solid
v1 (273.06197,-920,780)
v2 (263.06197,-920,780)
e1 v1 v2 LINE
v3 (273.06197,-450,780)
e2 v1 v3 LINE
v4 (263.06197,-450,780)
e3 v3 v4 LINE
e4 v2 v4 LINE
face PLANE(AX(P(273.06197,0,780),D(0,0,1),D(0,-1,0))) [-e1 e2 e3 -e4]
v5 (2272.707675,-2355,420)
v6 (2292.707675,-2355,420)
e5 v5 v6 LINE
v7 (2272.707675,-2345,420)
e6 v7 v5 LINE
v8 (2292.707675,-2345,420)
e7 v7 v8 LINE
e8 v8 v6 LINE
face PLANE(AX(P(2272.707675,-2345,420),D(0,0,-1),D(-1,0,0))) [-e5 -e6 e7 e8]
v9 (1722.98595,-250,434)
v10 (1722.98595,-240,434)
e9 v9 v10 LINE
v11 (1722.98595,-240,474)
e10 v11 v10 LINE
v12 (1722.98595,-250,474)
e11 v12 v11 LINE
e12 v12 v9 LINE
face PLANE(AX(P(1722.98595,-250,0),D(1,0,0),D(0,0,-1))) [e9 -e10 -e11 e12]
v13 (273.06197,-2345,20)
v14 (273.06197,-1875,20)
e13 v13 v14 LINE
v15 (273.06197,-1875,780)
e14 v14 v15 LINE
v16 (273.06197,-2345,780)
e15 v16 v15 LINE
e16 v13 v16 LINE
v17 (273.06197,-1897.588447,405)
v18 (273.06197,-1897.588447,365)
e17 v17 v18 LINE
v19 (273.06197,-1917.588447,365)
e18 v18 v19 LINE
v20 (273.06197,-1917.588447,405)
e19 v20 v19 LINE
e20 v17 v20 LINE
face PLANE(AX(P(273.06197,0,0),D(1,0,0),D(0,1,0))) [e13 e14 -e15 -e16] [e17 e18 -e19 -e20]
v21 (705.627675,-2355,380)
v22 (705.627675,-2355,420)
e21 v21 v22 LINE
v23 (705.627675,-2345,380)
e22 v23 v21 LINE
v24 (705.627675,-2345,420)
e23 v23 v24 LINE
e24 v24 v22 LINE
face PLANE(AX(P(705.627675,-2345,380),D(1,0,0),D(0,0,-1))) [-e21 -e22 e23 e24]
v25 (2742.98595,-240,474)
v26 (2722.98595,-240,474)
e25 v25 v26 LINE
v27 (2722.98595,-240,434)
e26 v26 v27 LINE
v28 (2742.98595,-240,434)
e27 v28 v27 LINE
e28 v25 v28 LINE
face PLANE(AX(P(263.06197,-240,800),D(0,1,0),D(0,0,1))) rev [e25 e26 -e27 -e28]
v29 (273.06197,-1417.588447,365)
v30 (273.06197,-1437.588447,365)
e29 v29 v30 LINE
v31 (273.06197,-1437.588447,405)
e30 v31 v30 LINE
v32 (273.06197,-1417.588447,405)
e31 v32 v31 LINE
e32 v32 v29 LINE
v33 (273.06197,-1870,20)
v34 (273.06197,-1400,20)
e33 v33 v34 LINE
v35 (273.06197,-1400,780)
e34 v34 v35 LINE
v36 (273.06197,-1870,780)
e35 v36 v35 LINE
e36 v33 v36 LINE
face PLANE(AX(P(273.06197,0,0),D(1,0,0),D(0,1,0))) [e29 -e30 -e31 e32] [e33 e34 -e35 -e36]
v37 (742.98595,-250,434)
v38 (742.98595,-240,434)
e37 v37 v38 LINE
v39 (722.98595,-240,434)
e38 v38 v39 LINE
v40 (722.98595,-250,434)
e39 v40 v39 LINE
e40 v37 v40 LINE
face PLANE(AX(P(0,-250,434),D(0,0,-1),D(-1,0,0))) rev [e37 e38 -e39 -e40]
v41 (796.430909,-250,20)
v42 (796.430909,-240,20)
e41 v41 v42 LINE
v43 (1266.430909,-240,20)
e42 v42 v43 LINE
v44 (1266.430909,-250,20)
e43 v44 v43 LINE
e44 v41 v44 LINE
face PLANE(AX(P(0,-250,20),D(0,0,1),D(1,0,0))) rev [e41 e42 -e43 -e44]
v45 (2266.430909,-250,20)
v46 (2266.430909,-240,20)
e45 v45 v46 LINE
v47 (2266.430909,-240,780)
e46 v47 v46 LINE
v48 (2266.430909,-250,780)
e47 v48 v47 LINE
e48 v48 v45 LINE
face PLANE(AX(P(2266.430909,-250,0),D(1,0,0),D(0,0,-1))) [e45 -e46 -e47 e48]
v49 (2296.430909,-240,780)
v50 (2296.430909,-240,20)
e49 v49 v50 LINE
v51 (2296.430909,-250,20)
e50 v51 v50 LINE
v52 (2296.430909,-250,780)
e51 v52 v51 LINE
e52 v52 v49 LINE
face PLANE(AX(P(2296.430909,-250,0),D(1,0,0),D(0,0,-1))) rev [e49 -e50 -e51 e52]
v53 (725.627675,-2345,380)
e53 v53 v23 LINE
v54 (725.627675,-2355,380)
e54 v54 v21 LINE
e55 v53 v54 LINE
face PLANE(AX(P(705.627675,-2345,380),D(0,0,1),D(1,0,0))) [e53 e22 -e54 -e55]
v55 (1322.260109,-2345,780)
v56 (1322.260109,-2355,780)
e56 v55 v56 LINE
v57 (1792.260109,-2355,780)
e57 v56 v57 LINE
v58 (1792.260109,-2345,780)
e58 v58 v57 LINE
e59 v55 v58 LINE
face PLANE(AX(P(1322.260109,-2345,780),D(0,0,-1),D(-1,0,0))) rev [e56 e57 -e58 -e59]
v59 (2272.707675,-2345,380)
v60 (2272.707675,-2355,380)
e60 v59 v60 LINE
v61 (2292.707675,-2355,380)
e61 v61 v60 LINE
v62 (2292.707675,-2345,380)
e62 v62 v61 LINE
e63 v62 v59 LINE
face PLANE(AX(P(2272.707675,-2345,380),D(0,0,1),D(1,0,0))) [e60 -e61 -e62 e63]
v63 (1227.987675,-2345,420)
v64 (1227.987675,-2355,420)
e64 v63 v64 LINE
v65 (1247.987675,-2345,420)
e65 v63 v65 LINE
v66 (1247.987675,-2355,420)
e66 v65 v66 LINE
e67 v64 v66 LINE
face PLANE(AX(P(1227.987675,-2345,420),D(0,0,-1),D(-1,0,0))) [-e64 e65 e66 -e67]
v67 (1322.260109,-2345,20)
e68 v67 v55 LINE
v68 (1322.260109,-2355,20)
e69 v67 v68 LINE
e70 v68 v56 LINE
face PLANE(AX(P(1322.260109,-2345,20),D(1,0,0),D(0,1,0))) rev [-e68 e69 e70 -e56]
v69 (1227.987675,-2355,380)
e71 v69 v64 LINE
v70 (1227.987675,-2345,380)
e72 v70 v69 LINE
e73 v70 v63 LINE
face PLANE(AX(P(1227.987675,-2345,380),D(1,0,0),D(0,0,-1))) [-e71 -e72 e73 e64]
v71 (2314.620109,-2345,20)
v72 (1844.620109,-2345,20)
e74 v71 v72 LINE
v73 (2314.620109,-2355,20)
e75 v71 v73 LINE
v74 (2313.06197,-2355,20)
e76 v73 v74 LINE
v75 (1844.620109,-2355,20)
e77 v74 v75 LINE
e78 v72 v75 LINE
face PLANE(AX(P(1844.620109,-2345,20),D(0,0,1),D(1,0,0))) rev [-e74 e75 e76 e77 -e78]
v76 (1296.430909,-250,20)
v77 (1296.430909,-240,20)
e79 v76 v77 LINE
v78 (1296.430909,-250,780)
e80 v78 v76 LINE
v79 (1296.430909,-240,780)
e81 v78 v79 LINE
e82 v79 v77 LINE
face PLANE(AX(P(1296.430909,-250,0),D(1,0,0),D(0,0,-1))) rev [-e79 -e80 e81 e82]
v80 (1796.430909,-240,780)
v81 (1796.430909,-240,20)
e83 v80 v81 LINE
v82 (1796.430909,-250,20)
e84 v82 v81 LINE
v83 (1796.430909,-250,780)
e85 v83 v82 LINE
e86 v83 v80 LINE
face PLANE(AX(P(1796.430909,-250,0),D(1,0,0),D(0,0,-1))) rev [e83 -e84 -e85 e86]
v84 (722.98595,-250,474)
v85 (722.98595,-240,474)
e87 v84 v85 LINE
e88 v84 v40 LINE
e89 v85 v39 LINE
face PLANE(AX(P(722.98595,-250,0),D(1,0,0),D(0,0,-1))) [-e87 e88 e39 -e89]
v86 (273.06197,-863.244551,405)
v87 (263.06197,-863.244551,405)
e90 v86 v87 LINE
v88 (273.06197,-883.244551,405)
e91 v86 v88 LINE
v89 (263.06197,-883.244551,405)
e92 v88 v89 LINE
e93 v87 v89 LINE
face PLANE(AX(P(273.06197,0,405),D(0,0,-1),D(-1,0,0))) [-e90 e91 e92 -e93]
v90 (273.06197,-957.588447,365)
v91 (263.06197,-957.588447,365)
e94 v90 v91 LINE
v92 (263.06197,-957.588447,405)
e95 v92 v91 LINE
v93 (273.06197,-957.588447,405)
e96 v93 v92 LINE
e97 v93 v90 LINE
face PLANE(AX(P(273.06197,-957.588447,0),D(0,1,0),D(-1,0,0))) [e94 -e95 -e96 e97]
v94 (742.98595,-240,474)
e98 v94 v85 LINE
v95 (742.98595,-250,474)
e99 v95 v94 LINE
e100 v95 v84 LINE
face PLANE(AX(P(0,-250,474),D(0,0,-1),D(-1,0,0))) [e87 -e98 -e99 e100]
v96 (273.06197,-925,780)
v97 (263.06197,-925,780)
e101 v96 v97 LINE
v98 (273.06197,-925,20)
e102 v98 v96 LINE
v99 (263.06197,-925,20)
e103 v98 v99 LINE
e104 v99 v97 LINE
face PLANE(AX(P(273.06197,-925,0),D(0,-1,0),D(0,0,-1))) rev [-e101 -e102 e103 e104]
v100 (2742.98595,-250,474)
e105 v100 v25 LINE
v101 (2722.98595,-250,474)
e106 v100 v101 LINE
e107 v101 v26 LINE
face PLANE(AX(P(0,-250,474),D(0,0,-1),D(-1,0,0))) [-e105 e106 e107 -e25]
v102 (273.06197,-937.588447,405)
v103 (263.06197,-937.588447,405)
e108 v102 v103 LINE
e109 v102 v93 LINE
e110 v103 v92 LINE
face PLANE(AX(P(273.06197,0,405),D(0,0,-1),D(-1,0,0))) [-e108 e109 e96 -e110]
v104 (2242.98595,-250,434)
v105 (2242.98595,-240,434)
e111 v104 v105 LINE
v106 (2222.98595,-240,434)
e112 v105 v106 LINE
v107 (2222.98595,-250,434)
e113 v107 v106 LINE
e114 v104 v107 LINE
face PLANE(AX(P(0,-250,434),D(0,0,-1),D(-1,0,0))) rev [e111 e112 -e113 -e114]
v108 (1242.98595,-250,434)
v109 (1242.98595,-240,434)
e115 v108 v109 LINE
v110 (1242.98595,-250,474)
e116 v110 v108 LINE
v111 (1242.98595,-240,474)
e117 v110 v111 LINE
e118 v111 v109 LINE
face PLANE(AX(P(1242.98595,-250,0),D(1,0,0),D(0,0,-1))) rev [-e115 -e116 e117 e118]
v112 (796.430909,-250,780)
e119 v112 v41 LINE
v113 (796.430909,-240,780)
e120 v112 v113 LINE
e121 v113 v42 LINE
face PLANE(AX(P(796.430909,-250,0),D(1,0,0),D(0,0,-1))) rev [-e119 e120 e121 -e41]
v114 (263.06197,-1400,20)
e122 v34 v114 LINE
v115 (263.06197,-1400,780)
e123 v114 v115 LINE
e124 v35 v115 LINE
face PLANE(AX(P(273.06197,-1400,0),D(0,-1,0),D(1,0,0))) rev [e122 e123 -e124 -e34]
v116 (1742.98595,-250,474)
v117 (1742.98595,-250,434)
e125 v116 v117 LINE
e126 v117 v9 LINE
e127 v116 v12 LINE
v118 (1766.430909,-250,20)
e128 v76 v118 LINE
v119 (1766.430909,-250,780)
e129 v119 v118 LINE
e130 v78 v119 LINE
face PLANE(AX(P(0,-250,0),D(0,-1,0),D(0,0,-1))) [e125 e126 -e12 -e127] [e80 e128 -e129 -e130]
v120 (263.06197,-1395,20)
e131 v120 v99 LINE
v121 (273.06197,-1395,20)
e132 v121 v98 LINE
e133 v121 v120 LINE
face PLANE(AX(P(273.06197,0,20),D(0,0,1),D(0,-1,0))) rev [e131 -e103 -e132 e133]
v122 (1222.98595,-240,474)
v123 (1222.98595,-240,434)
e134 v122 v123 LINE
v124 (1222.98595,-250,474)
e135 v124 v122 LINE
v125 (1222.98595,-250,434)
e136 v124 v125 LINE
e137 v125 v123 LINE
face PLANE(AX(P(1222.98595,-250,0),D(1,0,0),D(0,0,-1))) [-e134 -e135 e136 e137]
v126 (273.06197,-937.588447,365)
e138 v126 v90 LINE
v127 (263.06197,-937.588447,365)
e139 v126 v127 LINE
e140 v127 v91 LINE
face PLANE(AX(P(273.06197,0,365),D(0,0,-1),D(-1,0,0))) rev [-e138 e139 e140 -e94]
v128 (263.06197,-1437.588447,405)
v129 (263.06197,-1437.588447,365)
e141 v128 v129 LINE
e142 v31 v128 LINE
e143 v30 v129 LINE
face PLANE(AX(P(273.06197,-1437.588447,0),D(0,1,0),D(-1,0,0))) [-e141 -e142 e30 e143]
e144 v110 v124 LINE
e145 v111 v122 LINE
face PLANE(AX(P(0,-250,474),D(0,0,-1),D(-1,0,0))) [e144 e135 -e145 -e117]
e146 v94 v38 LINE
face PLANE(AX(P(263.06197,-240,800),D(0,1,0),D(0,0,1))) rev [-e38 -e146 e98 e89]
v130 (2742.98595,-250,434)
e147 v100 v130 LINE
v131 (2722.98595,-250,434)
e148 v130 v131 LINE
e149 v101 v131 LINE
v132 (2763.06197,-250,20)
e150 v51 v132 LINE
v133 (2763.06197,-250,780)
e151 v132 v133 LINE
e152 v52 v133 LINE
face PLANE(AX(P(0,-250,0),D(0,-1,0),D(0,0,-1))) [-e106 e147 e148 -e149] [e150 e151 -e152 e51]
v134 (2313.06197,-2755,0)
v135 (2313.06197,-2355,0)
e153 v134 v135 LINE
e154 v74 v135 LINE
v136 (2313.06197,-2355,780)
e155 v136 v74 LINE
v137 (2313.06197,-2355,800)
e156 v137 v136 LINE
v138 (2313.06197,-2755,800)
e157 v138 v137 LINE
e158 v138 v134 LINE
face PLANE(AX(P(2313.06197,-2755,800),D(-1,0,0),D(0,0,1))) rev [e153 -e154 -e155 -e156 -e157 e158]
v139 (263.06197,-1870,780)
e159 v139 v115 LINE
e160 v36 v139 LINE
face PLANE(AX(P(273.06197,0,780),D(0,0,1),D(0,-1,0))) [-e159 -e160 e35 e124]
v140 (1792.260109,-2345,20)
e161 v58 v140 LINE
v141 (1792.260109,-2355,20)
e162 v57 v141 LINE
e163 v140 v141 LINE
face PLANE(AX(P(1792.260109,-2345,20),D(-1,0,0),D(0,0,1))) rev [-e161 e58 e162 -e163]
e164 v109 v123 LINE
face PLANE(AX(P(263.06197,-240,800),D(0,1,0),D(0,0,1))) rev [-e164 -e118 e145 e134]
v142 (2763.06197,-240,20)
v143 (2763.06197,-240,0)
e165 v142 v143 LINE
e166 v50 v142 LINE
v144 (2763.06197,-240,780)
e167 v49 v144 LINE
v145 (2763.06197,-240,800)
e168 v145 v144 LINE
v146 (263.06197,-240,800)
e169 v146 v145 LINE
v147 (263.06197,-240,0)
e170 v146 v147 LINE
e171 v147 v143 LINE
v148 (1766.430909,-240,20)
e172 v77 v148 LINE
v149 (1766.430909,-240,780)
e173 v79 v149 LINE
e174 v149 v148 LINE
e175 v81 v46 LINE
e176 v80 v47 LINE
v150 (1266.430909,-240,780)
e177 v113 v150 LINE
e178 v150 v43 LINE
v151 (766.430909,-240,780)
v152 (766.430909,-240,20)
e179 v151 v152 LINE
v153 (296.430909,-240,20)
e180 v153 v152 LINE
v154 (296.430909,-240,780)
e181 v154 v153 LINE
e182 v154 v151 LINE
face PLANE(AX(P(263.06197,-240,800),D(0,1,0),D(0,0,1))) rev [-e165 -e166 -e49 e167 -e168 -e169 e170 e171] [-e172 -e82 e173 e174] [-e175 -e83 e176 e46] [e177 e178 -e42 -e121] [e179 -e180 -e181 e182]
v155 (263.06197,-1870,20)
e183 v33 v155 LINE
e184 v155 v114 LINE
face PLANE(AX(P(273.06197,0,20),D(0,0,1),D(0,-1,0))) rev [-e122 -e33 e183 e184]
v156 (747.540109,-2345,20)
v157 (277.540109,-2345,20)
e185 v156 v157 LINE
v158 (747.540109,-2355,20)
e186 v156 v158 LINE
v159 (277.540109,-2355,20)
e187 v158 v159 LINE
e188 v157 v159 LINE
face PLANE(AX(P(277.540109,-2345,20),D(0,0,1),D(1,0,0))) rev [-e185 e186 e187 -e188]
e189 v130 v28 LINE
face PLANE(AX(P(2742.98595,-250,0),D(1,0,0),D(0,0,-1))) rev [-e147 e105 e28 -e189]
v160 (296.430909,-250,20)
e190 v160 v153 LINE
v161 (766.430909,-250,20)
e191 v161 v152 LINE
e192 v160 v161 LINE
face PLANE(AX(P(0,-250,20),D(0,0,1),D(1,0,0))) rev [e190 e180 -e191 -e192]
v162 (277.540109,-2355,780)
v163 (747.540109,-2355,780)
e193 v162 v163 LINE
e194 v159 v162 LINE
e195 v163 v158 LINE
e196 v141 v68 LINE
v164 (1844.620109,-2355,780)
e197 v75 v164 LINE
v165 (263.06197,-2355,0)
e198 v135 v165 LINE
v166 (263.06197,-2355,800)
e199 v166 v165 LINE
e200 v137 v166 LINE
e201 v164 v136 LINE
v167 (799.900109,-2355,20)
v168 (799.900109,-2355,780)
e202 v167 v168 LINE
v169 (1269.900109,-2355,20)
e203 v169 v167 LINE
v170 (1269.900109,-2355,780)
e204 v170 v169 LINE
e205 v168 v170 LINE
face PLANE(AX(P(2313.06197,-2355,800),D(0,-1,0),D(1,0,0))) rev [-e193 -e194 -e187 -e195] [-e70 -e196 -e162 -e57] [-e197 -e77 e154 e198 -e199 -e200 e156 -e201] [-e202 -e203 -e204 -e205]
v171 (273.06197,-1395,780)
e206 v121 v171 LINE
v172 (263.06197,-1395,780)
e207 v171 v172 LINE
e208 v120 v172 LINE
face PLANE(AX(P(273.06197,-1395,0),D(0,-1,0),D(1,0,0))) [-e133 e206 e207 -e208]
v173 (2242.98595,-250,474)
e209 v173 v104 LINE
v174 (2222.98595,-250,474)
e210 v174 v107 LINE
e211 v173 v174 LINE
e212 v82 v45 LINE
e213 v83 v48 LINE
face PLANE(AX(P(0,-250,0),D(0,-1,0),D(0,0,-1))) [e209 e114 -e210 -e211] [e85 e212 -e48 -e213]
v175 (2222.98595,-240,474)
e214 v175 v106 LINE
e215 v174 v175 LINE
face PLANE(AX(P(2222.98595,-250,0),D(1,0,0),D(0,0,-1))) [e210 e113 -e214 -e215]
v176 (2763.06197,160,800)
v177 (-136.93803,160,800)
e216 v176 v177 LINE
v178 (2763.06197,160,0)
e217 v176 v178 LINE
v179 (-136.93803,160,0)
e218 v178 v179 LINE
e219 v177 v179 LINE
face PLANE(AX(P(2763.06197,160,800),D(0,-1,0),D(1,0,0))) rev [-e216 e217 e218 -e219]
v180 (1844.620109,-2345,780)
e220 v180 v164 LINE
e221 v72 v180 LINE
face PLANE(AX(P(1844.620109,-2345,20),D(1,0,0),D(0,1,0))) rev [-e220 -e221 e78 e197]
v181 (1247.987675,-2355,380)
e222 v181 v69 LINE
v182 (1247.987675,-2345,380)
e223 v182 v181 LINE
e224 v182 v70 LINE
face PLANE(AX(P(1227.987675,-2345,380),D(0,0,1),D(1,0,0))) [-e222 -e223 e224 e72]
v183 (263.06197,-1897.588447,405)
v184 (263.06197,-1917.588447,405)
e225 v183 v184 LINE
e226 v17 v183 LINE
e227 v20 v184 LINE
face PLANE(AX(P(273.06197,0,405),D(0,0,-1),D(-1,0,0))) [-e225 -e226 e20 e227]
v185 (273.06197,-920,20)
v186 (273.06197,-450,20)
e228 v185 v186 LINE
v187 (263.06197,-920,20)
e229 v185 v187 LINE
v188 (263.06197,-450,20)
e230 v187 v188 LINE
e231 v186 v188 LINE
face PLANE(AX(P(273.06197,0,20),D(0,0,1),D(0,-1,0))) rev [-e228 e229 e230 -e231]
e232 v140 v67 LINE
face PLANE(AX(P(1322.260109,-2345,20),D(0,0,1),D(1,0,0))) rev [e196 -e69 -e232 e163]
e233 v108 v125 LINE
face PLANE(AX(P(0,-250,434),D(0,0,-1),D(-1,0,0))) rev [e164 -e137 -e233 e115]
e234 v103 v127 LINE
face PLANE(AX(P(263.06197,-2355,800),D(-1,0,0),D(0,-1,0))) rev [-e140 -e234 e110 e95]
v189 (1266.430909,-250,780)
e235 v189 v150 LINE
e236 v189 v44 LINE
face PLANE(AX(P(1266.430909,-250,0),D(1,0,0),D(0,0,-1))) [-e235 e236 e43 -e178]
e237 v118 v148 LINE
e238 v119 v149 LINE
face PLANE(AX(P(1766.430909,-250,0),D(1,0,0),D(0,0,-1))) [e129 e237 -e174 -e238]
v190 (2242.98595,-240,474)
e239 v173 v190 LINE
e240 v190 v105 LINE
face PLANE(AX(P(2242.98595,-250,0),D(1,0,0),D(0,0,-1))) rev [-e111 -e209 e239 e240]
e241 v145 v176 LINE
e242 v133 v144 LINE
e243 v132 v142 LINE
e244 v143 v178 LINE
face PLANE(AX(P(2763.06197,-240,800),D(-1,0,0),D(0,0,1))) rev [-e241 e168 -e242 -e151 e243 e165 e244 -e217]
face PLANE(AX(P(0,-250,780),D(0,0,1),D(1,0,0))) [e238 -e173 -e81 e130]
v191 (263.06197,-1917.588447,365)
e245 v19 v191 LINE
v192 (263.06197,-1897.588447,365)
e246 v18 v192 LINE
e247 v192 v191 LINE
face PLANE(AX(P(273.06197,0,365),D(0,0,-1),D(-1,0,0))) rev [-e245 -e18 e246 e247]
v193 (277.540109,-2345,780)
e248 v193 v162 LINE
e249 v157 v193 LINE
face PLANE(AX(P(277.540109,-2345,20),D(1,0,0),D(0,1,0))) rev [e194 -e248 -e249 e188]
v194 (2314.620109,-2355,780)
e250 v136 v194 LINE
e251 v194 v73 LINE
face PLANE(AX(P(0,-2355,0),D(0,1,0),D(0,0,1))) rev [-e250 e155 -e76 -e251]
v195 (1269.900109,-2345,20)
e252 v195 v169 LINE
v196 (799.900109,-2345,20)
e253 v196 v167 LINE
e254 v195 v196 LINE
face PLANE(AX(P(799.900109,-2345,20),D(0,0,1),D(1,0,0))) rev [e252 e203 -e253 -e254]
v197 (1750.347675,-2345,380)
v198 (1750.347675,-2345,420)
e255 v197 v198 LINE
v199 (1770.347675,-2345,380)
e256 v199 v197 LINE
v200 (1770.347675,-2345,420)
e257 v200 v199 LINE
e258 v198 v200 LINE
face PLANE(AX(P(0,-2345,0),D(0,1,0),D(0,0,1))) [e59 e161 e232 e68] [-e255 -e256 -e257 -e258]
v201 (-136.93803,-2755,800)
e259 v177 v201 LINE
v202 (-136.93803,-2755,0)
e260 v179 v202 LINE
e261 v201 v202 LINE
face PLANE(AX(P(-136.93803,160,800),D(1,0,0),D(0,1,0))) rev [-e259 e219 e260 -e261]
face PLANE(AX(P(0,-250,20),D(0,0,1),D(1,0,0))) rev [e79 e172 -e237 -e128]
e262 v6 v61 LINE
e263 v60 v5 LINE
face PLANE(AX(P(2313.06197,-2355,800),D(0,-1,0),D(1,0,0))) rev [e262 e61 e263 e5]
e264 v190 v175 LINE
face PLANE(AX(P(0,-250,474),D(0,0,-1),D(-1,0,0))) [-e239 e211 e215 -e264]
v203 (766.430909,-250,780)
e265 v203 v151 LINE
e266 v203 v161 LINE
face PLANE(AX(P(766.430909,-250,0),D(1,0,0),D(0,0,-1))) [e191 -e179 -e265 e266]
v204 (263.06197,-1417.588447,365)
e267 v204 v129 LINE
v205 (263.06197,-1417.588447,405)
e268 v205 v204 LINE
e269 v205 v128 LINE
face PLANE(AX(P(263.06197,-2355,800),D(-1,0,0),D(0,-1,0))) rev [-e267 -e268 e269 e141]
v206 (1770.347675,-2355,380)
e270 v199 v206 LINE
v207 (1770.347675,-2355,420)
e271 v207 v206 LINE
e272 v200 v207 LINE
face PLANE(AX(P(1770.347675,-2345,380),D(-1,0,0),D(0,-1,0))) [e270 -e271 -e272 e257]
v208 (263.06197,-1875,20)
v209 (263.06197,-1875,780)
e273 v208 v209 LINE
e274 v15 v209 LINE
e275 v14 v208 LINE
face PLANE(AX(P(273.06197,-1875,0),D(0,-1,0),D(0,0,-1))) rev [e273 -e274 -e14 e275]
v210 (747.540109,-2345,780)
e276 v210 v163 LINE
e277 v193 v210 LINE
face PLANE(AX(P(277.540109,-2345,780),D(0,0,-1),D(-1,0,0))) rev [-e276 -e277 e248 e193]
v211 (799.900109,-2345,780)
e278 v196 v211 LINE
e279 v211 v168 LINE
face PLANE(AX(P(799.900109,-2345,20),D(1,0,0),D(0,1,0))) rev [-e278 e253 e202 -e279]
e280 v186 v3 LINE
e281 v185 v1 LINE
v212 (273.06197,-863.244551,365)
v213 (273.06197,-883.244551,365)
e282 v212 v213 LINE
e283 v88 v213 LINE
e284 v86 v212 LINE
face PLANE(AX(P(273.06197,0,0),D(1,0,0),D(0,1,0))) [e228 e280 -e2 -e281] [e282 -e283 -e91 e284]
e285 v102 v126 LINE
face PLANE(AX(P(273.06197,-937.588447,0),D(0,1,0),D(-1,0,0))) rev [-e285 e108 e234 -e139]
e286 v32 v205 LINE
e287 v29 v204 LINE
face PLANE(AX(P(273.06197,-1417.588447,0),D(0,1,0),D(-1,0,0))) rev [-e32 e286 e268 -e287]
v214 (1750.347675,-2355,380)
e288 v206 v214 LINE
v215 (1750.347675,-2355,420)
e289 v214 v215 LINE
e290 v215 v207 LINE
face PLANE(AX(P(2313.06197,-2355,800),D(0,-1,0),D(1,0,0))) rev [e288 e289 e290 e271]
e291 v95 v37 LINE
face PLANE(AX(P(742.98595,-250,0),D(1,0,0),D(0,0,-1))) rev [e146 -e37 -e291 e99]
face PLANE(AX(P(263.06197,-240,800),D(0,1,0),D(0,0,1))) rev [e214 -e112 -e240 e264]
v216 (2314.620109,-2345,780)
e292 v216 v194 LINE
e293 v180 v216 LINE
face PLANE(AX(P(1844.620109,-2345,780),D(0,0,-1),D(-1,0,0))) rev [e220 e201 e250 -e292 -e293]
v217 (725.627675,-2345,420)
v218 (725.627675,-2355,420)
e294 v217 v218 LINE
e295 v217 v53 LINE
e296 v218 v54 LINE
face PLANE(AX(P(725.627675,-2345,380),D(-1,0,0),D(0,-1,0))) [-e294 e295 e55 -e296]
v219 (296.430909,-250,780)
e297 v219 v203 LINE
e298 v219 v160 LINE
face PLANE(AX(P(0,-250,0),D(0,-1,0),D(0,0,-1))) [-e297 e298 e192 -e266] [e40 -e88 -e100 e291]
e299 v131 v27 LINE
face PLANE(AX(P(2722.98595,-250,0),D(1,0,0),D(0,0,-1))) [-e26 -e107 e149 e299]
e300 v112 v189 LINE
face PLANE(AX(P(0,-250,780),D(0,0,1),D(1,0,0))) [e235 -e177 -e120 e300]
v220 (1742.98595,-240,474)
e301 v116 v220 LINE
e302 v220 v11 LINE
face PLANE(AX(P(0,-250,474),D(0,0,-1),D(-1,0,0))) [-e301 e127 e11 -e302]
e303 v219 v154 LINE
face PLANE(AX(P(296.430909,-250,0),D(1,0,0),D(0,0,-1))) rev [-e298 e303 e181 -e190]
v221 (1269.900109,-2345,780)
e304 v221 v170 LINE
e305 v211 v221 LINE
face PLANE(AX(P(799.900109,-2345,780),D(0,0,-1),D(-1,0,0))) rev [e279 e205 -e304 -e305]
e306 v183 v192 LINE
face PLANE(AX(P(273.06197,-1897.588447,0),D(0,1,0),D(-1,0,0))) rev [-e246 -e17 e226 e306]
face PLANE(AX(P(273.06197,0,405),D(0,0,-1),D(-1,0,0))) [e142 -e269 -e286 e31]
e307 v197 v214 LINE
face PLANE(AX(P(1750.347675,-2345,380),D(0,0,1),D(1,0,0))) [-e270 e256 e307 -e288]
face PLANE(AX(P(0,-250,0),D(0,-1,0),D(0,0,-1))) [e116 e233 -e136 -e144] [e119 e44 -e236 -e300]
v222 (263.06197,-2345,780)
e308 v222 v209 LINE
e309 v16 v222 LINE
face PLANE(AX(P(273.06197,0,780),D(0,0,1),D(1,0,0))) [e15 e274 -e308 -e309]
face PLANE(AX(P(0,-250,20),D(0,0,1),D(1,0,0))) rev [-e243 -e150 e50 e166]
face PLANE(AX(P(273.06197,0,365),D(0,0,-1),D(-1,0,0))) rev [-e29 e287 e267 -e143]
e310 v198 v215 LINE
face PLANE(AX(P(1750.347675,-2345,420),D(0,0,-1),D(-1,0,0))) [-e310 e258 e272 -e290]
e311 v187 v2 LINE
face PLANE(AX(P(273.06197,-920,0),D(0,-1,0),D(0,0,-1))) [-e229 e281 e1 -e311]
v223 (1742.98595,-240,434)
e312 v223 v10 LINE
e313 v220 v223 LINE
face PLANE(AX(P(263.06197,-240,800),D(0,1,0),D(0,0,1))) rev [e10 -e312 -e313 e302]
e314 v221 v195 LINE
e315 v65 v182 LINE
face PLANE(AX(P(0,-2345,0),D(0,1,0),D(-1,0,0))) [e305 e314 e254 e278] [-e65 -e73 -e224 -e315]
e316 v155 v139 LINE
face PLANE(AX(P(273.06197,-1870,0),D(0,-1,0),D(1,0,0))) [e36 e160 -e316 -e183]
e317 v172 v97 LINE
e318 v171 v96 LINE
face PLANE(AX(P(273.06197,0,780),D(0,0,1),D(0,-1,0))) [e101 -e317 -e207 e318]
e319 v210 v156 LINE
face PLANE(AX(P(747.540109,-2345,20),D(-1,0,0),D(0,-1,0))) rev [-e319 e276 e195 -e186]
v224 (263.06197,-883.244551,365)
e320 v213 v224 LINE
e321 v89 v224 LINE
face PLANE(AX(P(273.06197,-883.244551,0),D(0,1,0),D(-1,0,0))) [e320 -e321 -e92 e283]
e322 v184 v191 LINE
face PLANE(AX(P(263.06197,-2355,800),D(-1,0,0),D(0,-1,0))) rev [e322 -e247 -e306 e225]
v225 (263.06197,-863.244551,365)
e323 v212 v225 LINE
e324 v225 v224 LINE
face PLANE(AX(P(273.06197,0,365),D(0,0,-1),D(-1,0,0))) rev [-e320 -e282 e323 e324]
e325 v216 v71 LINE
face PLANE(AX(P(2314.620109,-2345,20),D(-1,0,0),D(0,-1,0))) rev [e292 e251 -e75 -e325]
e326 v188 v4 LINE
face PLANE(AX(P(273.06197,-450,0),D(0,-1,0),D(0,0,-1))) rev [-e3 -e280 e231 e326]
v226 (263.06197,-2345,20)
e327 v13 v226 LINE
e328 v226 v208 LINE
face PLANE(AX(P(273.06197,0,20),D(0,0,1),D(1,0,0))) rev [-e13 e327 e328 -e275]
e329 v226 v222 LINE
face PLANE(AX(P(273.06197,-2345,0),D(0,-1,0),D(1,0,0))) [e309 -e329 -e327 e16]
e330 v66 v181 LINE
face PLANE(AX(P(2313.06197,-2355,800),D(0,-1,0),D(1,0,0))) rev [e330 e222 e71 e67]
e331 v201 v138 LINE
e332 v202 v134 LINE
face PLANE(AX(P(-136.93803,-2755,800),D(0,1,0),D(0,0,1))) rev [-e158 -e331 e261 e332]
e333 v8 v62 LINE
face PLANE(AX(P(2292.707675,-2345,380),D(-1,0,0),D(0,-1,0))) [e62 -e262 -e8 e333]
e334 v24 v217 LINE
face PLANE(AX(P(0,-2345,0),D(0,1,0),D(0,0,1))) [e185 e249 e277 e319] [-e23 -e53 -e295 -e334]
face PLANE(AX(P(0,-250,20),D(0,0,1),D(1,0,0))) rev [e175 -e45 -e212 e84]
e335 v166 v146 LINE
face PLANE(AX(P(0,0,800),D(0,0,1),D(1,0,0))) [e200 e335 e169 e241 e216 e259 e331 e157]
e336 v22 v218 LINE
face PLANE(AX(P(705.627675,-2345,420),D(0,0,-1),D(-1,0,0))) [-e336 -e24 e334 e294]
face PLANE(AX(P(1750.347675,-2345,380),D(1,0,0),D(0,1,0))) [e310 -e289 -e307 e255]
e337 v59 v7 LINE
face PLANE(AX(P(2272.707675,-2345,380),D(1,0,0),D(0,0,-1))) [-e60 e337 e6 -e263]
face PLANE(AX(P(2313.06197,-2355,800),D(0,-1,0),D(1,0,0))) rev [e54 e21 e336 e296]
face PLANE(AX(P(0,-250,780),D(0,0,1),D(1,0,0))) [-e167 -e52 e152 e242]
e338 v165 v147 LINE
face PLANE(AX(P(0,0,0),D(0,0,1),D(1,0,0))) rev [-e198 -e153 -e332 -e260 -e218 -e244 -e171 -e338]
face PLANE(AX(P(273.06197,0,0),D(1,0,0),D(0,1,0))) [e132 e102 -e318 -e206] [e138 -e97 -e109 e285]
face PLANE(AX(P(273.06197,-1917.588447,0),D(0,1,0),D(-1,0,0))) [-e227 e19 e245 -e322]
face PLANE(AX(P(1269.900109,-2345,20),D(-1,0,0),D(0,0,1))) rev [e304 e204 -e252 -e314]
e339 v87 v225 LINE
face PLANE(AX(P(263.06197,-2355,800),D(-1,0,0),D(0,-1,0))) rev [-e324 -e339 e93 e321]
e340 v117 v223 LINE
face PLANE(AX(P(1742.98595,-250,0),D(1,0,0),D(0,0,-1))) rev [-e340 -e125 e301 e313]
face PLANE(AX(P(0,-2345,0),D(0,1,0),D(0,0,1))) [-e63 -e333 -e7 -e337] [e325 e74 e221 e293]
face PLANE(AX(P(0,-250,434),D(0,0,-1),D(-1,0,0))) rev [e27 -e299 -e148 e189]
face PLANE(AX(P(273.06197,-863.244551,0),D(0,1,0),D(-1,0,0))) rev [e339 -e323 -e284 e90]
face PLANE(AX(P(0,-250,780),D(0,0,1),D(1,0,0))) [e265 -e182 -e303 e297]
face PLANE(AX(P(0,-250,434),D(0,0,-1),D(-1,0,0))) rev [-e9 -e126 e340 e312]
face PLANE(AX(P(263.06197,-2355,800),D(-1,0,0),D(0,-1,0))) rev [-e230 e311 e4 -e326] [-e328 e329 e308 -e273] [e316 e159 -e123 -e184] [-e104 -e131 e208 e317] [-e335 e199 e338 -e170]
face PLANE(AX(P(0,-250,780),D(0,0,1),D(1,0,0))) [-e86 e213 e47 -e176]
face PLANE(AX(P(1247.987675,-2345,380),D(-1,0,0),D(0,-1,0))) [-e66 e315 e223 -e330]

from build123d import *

# Parameters (mm, degrees)
BOSS_EXTRUDE1_DEPTH       = 800
SKETCH2_W                 = 470
SKETCH2_H                 = 760
SKETCH2_W_2               = 20
SKETCH2_H_2               = 40
BOSS_EXTRUDE2_DEPTH       = 10
SKETCH3_W                 = 760
SKETCH3_H                 = 470
SKETCH3_W_2               = 40
SKETCH3_H_2               = 20
BOSS_EXTRUDE3_DEPTH       = 10
BOSS_EXTRUDE4_OUTLINE_W   = 470
BOSS_EXTRUDE4_OUTLINE_H   = 760
BOSS_EXTRUDE4_OUTLINE_W_2 = 20
BOSS_EXTRUDE4_OUTLINE_H_2 = 40
BOSS_EXTRUDE4_OUTLINE_W_3 = 466.631060785
BOSS_EXTRUDE4_DEPTH       = 10


# Read off the part's stored shape, not the designer's step: Boss-Extrude4
with BuildPart() as part:
    # Sketch1 → Boss-Extrude1 (new body)
    with BuildSketch(Plane.XY):
        Polygon((2763.061970043, 160), (-136.938029957, 160), (-136.938029957, -2755), (2313.061970043, -2755), (2313.061970043, -2355), (263.061970043, -2355), (263.061970043, -240), (2763.061970043, -240), align=None)
    extrude(amount=BOSS_EXTRUDE1_DEPTH)

    # Sketch2 → Boss-Extrude2 (add)
    # profile 1 of 4: a face of its own
    with BuildSketch(Plane(origin=(0, -2355, 0), x_dir=(1, 0, 0), z_dir=(0, 1, 0))):
        with Locations((1034.900108644, -400)):
            Rectangle(SKETCH2_W, SKETCH2_H)
        with Locations((1237.987674913, -400)):
            Rectangle(SKETCH2_W_2, SKETCH2_H_2, mode=Mode.SUBTRACT)
    # profile 2 of 4: a face of its own
    with BuildSketch(Plane(origin=(0, -2355, 0), x_dir=(1, 0, 0), z_dir=(0, 1, 0))):
        with Locations((512.540108644, -400)):
            Rectangle(SKETCH2_W, SKETCH2_H)
        with Locations((715.627674913, -400)):
            Rectangle(SKETCH2_W_2, SKETCH2_H_2, mode=Mode.SUBTRACT)
    # profile 3 of 4: a face of its own
    with BuildSketch(Plane(origin=(0, -2355, 0), x_dir=(1, 0, 0), z_dir=(0, 1, 0))):
        with Locations((1557.260108644, -400)):
            Rectangle(SKETCH2_W, SKETCH2_H)
        with Locations((1760.347674913, -400)):
            Rectangle(SKETCH2_W_2, SKETCH2_H_2, mode=Mode.SUBTRACT)
    # profile 4 of 4: a face of its own
    with BuildSketch(Plane(origin=(0, -2355, 0), x_dir=(1, 0, 0), z_dir=(0, 1, 0))):
        with Locations((2079.620108644, -400)):
            Rectangle(SKETCH2_W, SKETCH2_H)
        with Locations((2282.707674913, -400)):
            Rectangle(SKETCH2_W_2, SKETCH2_H_2, mode=Mode.SUBTRACT)
    extrude(amount=BOSS_EXTRUDE2_DEPTH)

    # Sketch3 → Boss-Extrude3 (add)
    # profile 1 of 4: a face of its own
    with BuildSketch(Plane(origin=(263.061970043, 0, 0), x_dir=(0, 0, -1), z_dir=(1, 0, 0))):
        with Locations((-400, -1635)):
            Rectangle(SKETCH3_W, SKETCH3_H)
        with Locations((-385, -1427.588446785)):
            Rectangle(SKETCH3_W_2, SKETCH3_H_2, mode=Mode.SUBTRACT)
    # profile 2 of 4: a face of its own
    with BuildSketch(Plane(origin=(263.061970043, 0, 0), x_dir=(0, 0, -1), z_dir=(1, 0, 0))):
        with Locations((-400, -1160)):
            Rectangle(SKETCH3_W, SKETCH3_H)
        with Locations((-385, -947.588446785)):
            Rectangle(SKETCH3_W_2, SKETCH3_H_2, mode=Mode.SUBTRACT)
    # profile 3 of 4: a face of its own
    with BuildSketch(Plane(origin=(263.061970043, 0, 0), x_dir=(0, 0, -1), z_dir=(1, 0, 0))):
        with Locations((-400, -2110)):
            Rectangle(SKETCH3_W, SKETCH3_H)
        with Locations((-385, -1907.588446785)):
            Rectangle(SKETCH3_W_2, SKETCH3_H_2, mode=Mode.SUBTRACT)
    # profile 4 of 4: a face of its own
    with BuildSketch(Plane(origin=(263.061970043, 0, 0), x_dir=(0, 0, -1), z_dir=(1, 0, 0))):
        with Locations((-400, -685)):
            Rectangle(SKETCH3_W, SKETCH3_H)
        with Locations((-385, -873.244551229)):
            Rectangle(SKETCH3_W_2, SKETCH3_H_2, mode=Mode.SUBTRACT)
    extrude(amount=BOSS_EXTRUDE3_DEPTH)

    # Boss-Extrude4 outline → Boss-Extrude4 (add)
    # profile 1 of 5: a face of its own
    with BuildSketch(Plane.XZ.offset(240)):
        with Locations((531.430909258, 400)):
            Rectangle(BOSS_EXTRUDE4_OUTLINE_W, BOSS_EXTRUDE4_OUTLINE_H)
        with Locations((732.985950251, 454)):
            Rectangle(BOSS_EXTRUDE4_OUTLINE_W_2, BOSS_EXTRUDE4_OUTLINE_H_2, mode=Mode.SUBTRACT)
    # profile 2 of 5: a face of its own
    with BuildSketch(Plane.XZ.offset(240)):
        with Locations((1531.430909258, 400)):
            Rectangle(BOSS_EXTRUDE4_OUTLINE_W, BOSS_EXTRUDE4_OUTLINE_H)
        with Locations((1732.985950251, 454)):
            Rectangle(BOSS_EXTRUDE4_OUTLINE_W_2, BOSS_EXTRUDE4_OUTLINE_H_2, mode=Mode.SUBTRACT)
    # profile 3 of 5: a face of its own
    with BuildSketch(Plane.XZ.offset(240)):
        with Locations((2031.430909258, 400)):
            Rectangle(BOSS_EXTRUDE4_OUTLINE_W, BOSS_EXTRUDE4_OUTLINE_H)
        with Locations((2232.985950251, 454)):
            Rectangle(BOSS_EXTRUDE4_OUTLINE_W_2, BOSS_EXTRUDE4_OUTLINE_H_2, mode=Mode.SUBTRACT)
    # profile 4 of 5: a face of its own
    with BuildSketch(Plane.XZ.offset(240)):
        with Locations((2529.746439651, 400)):
            Rectangle(BOSS_EXTRUDE4_OUTLINE_W_3, BOSS_EXTRUDE4_OUTLINE_H)
        with Locations((2732.985950251, 454)):
            Rectangle(BOSS_EXTRUDE4_OUTLINE_W_2, BOSS_EXTRUDE4_OUTLINE_H_2, mode=Mode.SUBTRACT)
    # profile 5 of 5: a face of its own
    with BuildSketch(Plane.XZ.offset(240)):
        with Locations((1031.430909258, 400)):
            Rectangle(BOSS_EXTRUDE4_OUTLINE_W, BOSS_EXTRUDE4_OUTLINE_H)
        with Locations((1232.985950251, 454)):
            Rectangle(BOSS_EXTRUDE4_OUTLINE_W_2, BOSS_EXTRUDE4_OUTLINE_H_2, mode=Mode.SUBTRACT)
    extrude(amount=BOSS_EXTRUDE4_DEPTH)


solid = part.part
